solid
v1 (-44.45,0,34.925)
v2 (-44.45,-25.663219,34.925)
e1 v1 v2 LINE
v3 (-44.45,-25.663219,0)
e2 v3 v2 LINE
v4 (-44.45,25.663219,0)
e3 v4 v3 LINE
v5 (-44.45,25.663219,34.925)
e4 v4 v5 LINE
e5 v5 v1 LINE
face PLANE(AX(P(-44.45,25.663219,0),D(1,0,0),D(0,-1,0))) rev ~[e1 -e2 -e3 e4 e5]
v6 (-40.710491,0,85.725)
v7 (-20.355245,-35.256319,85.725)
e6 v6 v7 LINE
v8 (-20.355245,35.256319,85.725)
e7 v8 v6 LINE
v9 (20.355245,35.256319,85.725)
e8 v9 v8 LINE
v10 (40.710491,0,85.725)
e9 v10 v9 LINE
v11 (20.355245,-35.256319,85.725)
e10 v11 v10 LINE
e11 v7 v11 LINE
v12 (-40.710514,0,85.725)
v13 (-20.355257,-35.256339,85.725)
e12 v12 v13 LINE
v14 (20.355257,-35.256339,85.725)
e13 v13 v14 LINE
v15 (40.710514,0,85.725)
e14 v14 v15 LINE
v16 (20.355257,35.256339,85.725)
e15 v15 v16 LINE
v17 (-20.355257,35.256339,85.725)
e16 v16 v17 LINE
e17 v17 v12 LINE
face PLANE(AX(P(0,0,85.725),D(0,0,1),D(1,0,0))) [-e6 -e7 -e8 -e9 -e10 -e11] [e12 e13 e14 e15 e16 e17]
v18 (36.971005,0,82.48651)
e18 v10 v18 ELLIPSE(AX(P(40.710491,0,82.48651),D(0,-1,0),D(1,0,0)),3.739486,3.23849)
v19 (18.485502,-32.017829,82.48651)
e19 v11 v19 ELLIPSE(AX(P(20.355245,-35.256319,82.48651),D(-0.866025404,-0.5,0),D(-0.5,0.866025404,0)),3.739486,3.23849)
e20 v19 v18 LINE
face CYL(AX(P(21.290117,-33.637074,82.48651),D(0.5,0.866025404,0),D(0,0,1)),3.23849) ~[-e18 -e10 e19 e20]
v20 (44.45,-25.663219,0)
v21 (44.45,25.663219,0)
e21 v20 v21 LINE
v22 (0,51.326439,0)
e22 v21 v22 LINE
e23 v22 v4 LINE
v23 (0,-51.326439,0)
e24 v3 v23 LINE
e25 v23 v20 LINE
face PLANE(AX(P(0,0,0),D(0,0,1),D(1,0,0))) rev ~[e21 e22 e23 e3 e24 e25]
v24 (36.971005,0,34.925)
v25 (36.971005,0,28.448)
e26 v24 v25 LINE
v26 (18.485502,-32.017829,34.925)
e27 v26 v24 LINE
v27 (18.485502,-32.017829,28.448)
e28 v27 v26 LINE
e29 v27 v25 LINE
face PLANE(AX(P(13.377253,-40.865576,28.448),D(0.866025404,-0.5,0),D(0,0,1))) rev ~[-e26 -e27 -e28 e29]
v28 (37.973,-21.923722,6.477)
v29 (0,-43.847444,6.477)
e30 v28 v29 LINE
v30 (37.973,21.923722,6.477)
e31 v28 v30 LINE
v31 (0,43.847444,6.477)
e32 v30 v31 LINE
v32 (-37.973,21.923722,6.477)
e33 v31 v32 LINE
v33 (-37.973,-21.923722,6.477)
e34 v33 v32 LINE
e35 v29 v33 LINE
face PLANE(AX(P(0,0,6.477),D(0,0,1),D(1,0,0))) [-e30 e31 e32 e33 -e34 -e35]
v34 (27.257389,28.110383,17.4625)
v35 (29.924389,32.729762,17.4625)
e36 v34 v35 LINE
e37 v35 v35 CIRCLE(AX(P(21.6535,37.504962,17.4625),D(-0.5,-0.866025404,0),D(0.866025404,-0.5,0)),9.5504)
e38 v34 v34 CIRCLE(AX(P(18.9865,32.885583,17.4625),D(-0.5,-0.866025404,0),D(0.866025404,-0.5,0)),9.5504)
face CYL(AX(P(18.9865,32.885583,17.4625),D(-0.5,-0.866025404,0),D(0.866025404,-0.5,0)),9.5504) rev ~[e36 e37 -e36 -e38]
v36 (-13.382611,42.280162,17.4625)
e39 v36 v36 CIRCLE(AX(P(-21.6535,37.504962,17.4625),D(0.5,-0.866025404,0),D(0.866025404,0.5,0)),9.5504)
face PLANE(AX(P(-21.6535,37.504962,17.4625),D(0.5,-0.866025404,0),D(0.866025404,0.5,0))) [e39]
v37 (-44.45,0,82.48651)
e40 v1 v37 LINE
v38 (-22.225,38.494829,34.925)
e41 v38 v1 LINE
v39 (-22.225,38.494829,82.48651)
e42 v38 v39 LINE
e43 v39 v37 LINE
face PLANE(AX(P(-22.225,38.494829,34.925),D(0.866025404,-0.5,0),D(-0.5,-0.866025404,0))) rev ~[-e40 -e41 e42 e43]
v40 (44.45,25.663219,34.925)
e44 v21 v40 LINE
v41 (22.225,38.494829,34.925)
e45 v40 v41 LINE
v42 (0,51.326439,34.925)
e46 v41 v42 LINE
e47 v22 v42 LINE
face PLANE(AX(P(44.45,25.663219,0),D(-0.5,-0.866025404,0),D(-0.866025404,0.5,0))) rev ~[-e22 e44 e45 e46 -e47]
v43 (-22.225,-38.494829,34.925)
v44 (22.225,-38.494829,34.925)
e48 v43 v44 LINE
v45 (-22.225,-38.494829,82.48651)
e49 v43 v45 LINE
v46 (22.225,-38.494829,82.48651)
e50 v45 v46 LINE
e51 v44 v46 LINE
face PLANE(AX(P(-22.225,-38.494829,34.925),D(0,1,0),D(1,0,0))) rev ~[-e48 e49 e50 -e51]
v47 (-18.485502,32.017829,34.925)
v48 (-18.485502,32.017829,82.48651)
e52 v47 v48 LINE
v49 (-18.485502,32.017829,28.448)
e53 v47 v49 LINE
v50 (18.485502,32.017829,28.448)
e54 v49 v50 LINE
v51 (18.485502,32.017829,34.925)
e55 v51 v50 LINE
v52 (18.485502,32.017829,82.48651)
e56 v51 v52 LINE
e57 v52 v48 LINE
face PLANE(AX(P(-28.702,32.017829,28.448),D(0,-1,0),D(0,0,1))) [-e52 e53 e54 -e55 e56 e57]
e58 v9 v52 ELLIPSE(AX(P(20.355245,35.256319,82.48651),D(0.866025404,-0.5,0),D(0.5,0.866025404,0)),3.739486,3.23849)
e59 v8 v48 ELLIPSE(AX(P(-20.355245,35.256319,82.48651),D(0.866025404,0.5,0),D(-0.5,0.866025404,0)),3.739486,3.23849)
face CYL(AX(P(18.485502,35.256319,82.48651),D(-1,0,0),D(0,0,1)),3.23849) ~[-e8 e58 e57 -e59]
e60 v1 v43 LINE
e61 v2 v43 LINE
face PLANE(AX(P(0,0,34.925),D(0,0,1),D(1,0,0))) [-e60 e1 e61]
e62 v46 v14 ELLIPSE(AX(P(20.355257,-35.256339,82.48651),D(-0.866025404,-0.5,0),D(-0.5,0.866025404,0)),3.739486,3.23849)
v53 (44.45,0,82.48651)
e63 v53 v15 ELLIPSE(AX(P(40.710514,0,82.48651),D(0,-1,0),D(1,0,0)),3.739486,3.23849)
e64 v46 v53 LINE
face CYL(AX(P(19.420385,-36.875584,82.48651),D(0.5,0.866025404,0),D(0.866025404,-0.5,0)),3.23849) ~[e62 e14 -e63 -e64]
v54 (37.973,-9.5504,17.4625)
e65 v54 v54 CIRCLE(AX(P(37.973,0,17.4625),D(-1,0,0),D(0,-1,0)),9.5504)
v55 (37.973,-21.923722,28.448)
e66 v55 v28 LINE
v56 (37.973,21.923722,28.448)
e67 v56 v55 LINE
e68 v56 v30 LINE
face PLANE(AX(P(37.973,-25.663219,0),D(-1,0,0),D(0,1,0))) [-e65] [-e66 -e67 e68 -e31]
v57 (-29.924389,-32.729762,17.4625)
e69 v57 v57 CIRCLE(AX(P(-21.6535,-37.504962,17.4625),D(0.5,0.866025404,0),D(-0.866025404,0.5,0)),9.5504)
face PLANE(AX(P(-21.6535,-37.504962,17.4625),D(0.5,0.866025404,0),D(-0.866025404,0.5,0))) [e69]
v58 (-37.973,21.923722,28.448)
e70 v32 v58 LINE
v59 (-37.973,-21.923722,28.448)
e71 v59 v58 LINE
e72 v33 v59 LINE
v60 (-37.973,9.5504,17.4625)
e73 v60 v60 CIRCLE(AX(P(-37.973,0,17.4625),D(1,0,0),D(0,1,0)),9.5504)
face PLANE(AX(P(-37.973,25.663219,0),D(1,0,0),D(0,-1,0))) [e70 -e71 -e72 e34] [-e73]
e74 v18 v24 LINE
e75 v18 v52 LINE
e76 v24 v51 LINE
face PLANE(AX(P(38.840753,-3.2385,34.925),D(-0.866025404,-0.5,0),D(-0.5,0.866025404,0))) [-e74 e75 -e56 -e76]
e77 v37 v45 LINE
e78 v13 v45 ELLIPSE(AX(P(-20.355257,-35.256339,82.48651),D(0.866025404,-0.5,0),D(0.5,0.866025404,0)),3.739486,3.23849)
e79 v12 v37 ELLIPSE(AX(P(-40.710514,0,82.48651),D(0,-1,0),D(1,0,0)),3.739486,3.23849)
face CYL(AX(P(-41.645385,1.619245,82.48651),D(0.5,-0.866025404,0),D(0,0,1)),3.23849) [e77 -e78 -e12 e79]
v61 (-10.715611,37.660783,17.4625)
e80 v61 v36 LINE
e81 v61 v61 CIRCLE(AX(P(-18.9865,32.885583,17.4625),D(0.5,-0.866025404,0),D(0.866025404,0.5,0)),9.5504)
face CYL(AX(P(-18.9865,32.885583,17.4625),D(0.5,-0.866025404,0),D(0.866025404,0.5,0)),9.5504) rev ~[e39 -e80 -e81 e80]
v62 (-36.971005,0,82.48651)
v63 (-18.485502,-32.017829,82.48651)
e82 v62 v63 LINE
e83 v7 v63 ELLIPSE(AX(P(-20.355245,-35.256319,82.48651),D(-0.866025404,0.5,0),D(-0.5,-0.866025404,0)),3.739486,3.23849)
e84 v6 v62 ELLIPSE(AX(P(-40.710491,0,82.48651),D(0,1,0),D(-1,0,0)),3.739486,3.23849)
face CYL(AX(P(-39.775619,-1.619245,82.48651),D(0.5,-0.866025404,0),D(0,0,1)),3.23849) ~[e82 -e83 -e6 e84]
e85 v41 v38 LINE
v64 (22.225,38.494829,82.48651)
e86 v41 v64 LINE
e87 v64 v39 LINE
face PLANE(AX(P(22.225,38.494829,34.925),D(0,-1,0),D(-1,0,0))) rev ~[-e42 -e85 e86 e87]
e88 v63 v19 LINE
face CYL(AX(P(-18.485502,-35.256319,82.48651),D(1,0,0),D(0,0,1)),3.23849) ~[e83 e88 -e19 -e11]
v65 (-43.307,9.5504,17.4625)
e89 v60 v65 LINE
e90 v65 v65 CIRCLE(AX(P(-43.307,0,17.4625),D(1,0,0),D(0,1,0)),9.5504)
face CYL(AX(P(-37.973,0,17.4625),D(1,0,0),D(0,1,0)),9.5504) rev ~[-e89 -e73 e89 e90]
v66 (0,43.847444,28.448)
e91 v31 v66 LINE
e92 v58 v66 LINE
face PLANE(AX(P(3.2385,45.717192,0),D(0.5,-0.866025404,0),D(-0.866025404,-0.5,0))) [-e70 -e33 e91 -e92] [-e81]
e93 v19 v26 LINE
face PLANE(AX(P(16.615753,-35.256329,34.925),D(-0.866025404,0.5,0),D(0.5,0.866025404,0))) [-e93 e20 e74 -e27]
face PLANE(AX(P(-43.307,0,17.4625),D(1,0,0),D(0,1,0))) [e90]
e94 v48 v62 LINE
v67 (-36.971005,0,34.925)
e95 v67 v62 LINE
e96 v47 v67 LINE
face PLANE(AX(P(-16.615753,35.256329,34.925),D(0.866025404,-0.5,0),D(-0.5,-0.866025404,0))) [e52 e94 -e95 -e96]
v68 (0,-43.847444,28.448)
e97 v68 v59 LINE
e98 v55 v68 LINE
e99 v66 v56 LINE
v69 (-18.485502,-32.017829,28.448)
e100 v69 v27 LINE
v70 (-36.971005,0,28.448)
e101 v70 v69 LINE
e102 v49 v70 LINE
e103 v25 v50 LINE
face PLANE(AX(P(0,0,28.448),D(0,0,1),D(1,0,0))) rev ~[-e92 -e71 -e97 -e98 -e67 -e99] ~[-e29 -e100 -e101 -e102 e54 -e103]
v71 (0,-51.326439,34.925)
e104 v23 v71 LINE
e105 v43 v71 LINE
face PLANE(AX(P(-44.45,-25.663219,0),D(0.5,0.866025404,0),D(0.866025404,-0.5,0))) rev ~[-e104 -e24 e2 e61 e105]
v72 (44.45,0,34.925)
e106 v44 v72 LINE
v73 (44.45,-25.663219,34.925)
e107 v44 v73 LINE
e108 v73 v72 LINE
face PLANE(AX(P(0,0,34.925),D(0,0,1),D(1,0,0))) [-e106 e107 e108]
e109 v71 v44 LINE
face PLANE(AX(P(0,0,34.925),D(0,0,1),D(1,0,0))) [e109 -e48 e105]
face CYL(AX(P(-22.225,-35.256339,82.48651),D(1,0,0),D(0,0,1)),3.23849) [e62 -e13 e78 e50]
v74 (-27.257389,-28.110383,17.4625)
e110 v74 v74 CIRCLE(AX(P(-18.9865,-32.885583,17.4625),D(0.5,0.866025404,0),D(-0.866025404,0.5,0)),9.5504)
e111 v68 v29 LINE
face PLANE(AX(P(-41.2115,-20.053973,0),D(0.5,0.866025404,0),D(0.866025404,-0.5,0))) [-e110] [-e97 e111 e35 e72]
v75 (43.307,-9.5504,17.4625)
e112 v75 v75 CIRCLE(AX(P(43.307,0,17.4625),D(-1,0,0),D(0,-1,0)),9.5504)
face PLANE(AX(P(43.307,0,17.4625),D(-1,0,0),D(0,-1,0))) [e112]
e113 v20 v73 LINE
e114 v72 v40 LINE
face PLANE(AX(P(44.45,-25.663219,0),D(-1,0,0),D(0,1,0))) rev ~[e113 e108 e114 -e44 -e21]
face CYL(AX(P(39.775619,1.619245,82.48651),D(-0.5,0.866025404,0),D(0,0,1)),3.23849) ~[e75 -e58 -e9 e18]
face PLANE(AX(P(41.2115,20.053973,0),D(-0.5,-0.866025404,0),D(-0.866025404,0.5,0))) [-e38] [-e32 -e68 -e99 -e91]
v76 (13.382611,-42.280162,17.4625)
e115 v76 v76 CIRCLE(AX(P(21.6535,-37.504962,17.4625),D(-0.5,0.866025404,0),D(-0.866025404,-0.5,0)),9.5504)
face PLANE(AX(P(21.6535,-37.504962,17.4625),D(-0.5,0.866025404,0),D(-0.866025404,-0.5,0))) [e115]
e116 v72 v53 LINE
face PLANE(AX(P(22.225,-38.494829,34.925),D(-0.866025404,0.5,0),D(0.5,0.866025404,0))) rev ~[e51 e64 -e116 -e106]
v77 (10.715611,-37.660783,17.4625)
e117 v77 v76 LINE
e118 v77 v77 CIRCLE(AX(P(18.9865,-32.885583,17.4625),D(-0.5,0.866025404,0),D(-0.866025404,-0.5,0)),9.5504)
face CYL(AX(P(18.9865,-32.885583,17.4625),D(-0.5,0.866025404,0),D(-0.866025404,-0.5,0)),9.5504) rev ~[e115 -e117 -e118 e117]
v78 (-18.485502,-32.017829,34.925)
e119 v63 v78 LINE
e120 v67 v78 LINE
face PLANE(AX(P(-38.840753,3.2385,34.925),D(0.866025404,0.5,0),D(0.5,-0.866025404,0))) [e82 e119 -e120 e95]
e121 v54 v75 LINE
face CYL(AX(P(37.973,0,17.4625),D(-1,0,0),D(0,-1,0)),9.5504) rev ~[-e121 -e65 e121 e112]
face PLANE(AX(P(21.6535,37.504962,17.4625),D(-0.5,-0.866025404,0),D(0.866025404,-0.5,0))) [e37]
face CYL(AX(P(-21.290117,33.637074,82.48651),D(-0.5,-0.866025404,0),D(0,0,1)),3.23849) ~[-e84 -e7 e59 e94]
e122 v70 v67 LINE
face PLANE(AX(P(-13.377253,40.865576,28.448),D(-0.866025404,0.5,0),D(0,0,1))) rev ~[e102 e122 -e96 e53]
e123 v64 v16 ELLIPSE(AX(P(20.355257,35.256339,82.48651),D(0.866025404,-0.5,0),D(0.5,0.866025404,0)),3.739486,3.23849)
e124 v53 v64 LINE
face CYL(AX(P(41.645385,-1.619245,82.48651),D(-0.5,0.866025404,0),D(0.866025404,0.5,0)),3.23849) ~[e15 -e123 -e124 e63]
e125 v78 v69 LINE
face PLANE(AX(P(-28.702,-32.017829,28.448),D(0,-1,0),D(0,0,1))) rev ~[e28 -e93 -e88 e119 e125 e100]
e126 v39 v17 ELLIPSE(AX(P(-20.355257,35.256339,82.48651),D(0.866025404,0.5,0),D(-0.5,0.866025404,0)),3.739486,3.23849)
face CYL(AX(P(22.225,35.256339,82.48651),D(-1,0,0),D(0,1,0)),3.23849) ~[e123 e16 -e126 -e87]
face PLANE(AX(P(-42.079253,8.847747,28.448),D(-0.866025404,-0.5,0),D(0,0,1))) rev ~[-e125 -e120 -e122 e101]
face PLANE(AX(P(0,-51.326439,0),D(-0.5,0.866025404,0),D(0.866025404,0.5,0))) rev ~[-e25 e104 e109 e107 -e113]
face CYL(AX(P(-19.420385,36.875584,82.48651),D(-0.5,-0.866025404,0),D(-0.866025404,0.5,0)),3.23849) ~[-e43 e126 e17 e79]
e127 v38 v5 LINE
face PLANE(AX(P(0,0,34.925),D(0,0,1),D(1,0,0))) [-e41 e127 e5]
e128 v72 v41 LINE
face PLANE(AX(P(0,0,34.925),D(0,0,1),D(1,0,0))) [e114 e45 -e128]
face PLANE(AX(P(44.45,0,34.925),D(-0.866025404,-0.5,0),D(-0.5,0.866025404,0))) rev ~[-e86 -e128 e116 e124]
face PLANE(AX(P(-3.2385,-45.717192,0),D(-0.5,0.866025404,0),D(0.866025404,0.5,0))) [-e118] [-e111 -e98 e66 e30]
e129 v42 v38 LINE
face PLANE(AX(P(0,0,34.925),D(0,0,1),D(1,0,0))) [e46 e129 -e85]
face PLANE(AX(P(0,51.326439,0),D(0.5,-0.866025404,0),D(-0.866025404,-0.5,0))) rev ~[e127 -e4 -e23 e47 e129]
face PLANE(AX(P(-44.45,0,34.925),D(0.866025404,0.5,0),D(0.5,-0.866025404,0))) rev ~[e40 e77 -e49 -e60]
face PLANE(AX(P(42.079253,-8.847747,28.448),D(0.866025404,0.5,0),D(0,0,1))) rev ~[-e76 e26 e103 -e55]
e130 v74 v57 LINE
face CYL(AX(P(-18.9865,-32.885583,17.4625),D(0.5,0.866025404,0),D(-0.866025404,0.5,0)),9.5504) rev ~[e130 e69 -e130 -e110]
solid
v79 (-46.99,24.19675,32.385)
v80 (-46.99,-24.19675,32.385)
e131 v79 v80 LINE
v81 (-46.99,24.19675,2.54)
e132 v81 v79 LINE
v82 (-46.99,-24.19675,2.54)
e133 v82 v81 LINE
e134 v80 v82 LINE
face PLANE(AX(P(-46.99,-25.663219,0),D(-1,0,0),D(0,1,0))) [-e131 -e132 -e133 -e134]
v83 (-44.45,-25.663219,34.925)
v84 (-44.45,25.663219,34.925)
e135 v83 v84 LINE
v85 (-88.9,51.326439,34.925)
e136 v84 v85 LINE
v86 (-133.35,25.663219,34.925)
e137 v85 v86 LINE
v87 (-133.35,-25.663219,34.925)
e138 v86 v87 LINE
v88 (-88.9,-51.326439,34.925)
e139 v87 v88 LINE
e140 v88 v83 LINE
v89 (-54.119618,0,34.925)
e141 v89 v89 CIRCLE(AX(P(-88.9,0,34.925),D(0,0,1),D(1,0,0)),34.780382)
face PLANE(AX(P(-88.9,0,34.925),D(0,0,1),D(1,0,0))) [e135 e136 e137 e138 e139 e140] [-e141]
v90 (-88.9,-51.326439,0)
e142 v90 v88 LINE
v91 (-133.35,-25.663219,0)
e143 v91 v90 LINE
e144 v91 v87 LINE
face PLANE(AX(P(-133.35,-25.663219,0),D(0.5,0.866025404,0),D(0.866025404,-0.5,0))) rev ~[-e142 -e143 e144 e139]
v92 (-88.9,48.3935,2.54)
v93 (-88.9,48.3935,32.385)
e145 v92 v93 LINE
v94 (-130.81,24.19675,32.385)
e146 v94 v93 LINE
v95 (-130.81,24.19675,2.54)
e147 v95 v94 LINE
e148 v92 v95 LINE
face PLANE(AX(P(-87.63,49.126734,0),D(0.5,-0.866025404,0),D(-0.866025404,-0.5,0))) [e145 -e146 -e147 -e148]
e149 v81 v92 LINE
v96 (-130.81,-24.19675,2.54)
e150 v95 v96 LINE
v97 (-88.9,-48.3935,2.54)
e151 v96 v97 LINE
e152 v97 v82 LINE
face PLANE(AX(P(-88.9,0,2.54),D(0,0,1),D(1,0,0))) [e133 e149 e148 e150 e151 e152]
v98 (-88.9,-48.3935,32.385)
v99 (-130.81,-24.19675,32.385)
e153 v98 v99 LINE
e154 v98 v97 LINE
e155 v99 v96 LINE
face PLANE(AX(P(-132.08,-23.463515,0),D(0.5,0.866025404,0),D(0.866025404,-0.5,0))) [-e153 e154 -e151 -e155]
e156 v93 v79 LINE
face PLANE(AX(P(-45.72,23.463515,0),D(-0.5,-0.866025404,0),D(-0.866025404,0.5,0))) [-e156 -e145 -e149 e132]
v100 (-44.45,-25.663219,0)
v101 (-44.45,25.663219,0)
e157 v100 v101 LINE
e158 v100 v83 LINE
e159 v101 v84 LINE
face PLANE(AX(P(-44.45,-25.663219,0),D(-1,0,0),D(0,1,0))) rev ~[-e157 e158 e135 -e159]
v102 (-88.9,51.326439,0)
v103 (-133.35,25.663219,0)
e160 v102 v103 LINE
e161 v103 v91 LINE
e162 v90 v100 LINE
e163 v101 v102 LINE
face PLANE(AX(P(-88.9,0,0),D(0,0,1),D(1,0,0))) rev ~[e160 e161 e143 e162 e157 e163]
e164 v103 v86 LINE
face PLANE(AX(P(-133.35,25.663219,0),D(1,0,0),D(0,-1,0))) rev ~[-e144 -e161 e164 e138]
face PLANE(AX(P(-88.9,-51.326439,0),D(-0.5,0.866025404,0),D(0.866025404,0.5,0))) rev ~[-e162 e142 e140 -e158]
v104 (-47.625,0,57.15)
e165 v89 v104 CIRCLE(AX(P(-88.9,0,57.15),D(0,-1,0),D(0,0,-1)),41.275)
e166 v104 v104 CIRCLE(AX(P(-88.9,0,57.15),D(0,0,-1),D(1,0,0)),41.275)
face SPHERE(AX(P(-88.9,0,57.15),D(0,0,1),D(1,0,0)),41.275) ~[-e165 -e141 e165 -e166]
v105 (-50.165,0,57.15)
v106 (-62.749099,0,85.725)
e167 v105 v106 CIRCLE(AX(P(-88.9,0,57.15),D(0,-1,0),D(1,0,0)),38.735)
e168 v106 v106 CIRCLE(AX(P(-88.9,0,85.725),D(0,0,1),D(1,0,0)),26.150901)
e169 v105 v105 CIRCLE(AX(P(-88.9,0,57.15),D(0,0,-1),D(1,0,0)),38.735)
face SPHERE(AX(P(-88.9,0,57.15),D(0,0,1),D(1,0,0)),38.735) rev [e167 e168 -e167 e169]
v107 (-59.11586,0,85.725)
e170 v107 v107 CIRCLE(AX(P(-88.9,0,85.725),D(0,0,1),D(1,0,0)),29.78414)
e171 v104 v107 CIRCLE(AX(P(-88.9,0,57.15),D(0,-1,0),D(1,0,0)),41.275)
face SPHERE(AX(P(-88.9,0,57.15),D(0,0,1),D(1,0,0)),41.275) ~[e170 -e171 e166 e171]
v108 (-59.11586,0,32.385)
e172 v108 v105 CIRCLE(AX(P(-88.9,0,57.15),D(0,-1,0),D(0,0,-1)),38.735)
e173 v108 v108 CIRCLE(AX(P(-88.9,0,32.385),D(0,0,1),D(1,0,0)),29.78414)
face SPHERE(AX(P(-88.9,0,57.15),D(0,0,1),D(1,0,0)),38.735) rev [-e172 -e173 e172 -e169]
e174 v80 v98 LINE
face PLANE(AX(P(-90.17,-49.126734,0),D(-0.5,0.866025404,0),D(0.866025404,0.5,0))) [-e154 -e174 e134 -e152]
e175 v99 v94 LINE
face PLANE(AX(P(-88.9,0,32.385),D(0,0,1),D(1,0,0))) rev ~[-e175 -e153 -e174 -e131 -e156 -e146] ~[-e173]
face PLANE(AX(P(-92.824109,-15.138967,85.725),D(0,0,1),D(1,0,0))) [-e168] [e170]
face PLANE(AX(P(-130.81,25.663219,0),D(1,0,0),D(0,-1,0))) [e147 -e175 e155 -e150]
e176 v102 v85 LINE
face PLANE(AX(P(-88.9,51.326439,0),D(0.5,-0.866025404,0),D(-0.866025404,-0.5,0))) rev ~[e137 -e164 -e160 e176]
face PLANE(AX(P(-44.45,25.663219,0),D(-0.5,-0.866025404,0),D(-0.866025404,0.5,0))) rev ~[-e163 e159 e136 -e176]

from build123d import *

# Parameters (mm, degrees)
F1_DEPTH        = 34.925
F3_DEPTH        = 50.8
F4_T            = 6.477
F4_T3_DEPTH     = 57.404
F4_T5_DEPTH     = 57.404
F4_T7_DEPTH     = 57.404
F4_T9_DEPTH     = 57.404
F4_T11_DEPTH    = 57.404
F5_R            = 3.23849
F6_R            = 9.5504
F7_DEPTH        = 5.334
F7_COPIES_COUNT = 6
F9_DEPTH        = 34.925
F15_T           = -2.54
F16_W           = 90.7614380121
F16_H           = 120.473433286
F17_DEPTH       = 25.4


# Not quite as in the source:
# - a fillet or chamfer is up to 0.001 mm smaller than in the source, because OpenCascade refuses the exact size
# - a pattern or mirror of a feature is missing from the dataset's text; its kind, count and spacing are read off the source's solid
# - a shell that OpenCascade refuses in one call is made with other operations: the cavity is built on its own and cut out


with BuildPart() as f1:
    # F0 (on Top) → F1 (new body)
    with BuildSketch(Plane.XY):
        Polygon((44.45, 25.6632194655), (0, 51.326438931), (-44.45, 25.6632194655), (-44.45, -25.6632194655), (0, -51.326438931), (44.45, -25.6632194655), align=None)
    extrude(amount=F1_DEPTH)

    # F2 (on face) → F3 (join)
    with BuildSketch(Plane.XY.offset(34.925)):
        Polygon((44.45, 0), (22.225, 38.4948291982), (-22.225, 38.4948291982), (-44.45, 0), (-22.225, -38.4948291982), (22.225, -38.4948291982), align=None)
    extrude(amount=F3_DEPTH)

    # F4: shell of thickness 6.477, made by hand


with BuildPart() as f4_core1:
    # F4_t2: copy of F1
    add(f1.part)

    # the walls: a layer under each face that stays
    f4_faces = [f4_core1.faces().sort_by_distance(p)[0] for p in [
        (22.225, 38.4948291982, 17.4625),
        (44.45, 0, 17.4625),
        (-22.225, 38.4948291982, 17.4625),
        (0, 0, 0),
        (40.7458333333, 19.2474145991, 34.925),
        (0, 44.9106340646, 34.925),
        (22.225, -38.4948291982, 17.4625),
        (40.7458333333, -19.2474145991, 34.925),
        (-44.45, 0, 17.4625),
        (-40.7458333333, 19.2474145991, 34.925),
        (-22.225, -38.4948291982, 17.4625),
        (33.3375, 19.2474145991, 60.325),
        (0, 38.4948291982, 60.325),
        (0, -44.9106340646, 34.925),
        (33.3375, -19.2474145991, 60.325),
        (-40.7458333333, -19.2474145991, 34.925),
        (-33.3375, 19.2474145991, 60.325),
        (0, -38.4948291982, 60.325),
        (-33.3375, -19.2474145991, 60.325),
    ]]
    thicken(f4_faces, amount=-F4_T, mode=Mode.SUBTRACT)

    # F4_s4 → F4_t3 (cut)
    with BuildSketch(Plane(origin=(14.351, -24.8566611394, 0), x_dir=(0, 0, 1), z_dir=(-0.5, 0.8660254038, 0))):
        Polygon((34.98977, 38.5595991982), (28.448, 38.4948291982), (28.448, 32.0178291982), (34.925, 32.0178291982), align=None)
    extrude(amount=F4_T3_DEPTH, mode=Mode.SUBTRACT)

    # F4_s6 → F4_t5 (cut)
    with BuildSketch(Plane.YZ.offset(-28.702)):
        Polygon((38.5595991982, 34.98977), (38.4948291982, 28.448), (32.0178291982, 28.448), (32.0178291982, 34.925), align=None)
        Polygon((-38.5595991982, 34.98977), (-38.4948291982, 28.448), (-32.0178291982, 28.448), (-32.0178291982, 34.925), align=None)
    extrude(amount=F4_T5_DEPTH, mode=Mode.SUBTRACT)

    # F4_s8 → F4_t7 (cut)
    with BuildSketch(Plane(origin=(-14.351, -24.8566611394, 0), x_dir=(0, 0, 1), z_dir=(0.5, 0.8660254038, 0))):
        Polygon((34.98977, 38.5595991982), (28.448, 38.4948291982), (28.448, 32.0178291982), (34.925, 32.0178291982), align=None)
    extrude(amount=F4_T7_DEPTH, mode=Mode.SUBTRACT)

    # F4_s10 → F4_t9 (cut)
    with BuildSketch(Plane(origin=(14.351, 24.8566611394, 0), x_dir=(0, 0, 1), z_dir=(-0.5, -0.8660254038, 0))):
        Polygon((34.98977, 38.5595991982), (28.448, 38.4948291982), (28.448, 32.0178291982), (34.925, 32.0178291982), align=None)
    extrude(amount=F4_T9_DEPTH, mode=Mode.SUBTRACT)

    # F4_s12 → F4_t11 (cut)
    with BuildSketch(Plane(origin=(-14.351, 24.8566611394, 0), x_dir=(0, 0, 1), z_dir=(0.5, -0.8660254038, 0))):
        Polygon((34.98977, 38.5595991982), (28.448, 38.4948291982), (28.448, 32.0178291982), (34.925, 32.0178291982), align=None)
    extrude(amount=F4_T11_DEPTH, mode=Mode.SUBTRACT)


with BuildPart() as f1_1:
    add(f1.part)

    # what is left inside the walls is the cavity
    f4_cavity = [f4_core1.part.solids().sort_by_distance(p)[0] for p in [
        (0, -14.615815, 6.54177),
    ]]
    add(f4_cavity, mode=Mode.SUBTRACT)

    # F5 (radius 3.2385 in the source; OpenCascade refuses exactly that, so slightly less here)
    f5_edges = [f1_1.edges().sort_by_distance(p)[0] for p in [
        (33.3375, -19.247415, 85.725),
        (0, -38.494829, 85.725),
        (33.3375, 19.247415, 85.725),
        (-33.3375, -19.247415, 85.725),
        (0, 38.494829, 85.725),
        (-33.3375, 19.247415, 85.725),
        (27.728253, -16.008915, 85.725),
        (27.728253, 16.008915, 85.725),
        (0, 32.017829, 85.725),
        (-27.728253, 16.008915, 85.725),
        (-27.728253, -16.008915, 85.725),
        (0, -32.017829, 85.725),
    ]]
    fillet(f5_edges, radius=F5_R)

    # F6 (on face) → F7 (cut)
    with BuildSketch(Plane(origin=(18.9865, -32.8855826579, 0), x_dir=(-0.8660254038, -0.5, 0), z_dir=(-0.5, 0.8660254038, 0))):
        with Locations((0, 17.4625)):
            Circle(F6_R)
    f7 = extrude(amount=-F7_DEPTH, mode=Mode.SUBTRACT)

    # F7_copies: F7 ×6 about axis
    f7_copies_axis = Axis((0, 0, 0), (0, 0, 1))
    for i in range(1, F7_COPIES_COUNT):
        add(f7.rotate(f7_copies_axis, i * 360 / F7_COPIES_COUNT), mode=Mode.SUBTRACT)


with BuildPart() as f9:
    # F8 (on Top) → F9 (new body)
    with BuildSketch(Plane.XY):
        Polygon((-44.45, -25.6632194655), (-44.45, 25.6632194655), (-88.9, 51.326438931), (-133.35, 25.6632194655), (-133.35, -25.6632194655), (-88.9, -51.326438931), align=None)
    extrude(amount=F9_DEPTH)

    # F10 (on Front) → F12 (revolve)
    with BuildSketch(Plane.XZ):
        with BuildLine():
            ThreePointArc((-88.9, 15.875), (-59.7141676065, 27.9641676065), (-47.625, 57.15))
            ThreePointArc((-47.625, 57.15), (-59.7141676065, 86.3358323935), (-88.9, 98.425))
            Line((-88.9, 98.425), (-88.9, 15.875))
        make_face()
    revolve(axis=Axis((-88.9, 0, 57.15), (0, 0, -1)))

    # F13 (on Front) → F14 (revolve, cut)
    with BuildSketch(Plane.XZ):
        with BuildLine():
            ThreePointArc((-88.9, 82.55), (-77.6746798487, 87.1996798487), (-73.025, 98.425))
            ThreePointArc((-73.025, 98.425), (-77.6746798487, 109.6503201513), (-88.9, 114.3))
            Line((-88.9, 114.3), (-88.9, 82.55))
        make_face()
    revolve(axis=Axis((-88.9, 0, 98.425), (0, 0, 1)), mode=Mode.SUBTRACT)

    # F15
    f15_openings = [f9.faces().sort_by_distance(p)[0] for p in [
        (-98.988386, 0, 86.167754),
    ]]
    offset(amount=F15_T, openings=f15_openings, kind=Kind.INTERSECTION)

    # F16 (on offset) → F17 (cut)
    with BuildSketch(Plane.XY.offset(85.725)):
        with Locations((-92.8241088986, -15.1389669627)):
            Rectangle(F16_W, F16_H)
    extrude(amount=F17_DEPTH, mode=Mode.SUBTRACT)


solid = Compound([f1_1.part, f9.part])
